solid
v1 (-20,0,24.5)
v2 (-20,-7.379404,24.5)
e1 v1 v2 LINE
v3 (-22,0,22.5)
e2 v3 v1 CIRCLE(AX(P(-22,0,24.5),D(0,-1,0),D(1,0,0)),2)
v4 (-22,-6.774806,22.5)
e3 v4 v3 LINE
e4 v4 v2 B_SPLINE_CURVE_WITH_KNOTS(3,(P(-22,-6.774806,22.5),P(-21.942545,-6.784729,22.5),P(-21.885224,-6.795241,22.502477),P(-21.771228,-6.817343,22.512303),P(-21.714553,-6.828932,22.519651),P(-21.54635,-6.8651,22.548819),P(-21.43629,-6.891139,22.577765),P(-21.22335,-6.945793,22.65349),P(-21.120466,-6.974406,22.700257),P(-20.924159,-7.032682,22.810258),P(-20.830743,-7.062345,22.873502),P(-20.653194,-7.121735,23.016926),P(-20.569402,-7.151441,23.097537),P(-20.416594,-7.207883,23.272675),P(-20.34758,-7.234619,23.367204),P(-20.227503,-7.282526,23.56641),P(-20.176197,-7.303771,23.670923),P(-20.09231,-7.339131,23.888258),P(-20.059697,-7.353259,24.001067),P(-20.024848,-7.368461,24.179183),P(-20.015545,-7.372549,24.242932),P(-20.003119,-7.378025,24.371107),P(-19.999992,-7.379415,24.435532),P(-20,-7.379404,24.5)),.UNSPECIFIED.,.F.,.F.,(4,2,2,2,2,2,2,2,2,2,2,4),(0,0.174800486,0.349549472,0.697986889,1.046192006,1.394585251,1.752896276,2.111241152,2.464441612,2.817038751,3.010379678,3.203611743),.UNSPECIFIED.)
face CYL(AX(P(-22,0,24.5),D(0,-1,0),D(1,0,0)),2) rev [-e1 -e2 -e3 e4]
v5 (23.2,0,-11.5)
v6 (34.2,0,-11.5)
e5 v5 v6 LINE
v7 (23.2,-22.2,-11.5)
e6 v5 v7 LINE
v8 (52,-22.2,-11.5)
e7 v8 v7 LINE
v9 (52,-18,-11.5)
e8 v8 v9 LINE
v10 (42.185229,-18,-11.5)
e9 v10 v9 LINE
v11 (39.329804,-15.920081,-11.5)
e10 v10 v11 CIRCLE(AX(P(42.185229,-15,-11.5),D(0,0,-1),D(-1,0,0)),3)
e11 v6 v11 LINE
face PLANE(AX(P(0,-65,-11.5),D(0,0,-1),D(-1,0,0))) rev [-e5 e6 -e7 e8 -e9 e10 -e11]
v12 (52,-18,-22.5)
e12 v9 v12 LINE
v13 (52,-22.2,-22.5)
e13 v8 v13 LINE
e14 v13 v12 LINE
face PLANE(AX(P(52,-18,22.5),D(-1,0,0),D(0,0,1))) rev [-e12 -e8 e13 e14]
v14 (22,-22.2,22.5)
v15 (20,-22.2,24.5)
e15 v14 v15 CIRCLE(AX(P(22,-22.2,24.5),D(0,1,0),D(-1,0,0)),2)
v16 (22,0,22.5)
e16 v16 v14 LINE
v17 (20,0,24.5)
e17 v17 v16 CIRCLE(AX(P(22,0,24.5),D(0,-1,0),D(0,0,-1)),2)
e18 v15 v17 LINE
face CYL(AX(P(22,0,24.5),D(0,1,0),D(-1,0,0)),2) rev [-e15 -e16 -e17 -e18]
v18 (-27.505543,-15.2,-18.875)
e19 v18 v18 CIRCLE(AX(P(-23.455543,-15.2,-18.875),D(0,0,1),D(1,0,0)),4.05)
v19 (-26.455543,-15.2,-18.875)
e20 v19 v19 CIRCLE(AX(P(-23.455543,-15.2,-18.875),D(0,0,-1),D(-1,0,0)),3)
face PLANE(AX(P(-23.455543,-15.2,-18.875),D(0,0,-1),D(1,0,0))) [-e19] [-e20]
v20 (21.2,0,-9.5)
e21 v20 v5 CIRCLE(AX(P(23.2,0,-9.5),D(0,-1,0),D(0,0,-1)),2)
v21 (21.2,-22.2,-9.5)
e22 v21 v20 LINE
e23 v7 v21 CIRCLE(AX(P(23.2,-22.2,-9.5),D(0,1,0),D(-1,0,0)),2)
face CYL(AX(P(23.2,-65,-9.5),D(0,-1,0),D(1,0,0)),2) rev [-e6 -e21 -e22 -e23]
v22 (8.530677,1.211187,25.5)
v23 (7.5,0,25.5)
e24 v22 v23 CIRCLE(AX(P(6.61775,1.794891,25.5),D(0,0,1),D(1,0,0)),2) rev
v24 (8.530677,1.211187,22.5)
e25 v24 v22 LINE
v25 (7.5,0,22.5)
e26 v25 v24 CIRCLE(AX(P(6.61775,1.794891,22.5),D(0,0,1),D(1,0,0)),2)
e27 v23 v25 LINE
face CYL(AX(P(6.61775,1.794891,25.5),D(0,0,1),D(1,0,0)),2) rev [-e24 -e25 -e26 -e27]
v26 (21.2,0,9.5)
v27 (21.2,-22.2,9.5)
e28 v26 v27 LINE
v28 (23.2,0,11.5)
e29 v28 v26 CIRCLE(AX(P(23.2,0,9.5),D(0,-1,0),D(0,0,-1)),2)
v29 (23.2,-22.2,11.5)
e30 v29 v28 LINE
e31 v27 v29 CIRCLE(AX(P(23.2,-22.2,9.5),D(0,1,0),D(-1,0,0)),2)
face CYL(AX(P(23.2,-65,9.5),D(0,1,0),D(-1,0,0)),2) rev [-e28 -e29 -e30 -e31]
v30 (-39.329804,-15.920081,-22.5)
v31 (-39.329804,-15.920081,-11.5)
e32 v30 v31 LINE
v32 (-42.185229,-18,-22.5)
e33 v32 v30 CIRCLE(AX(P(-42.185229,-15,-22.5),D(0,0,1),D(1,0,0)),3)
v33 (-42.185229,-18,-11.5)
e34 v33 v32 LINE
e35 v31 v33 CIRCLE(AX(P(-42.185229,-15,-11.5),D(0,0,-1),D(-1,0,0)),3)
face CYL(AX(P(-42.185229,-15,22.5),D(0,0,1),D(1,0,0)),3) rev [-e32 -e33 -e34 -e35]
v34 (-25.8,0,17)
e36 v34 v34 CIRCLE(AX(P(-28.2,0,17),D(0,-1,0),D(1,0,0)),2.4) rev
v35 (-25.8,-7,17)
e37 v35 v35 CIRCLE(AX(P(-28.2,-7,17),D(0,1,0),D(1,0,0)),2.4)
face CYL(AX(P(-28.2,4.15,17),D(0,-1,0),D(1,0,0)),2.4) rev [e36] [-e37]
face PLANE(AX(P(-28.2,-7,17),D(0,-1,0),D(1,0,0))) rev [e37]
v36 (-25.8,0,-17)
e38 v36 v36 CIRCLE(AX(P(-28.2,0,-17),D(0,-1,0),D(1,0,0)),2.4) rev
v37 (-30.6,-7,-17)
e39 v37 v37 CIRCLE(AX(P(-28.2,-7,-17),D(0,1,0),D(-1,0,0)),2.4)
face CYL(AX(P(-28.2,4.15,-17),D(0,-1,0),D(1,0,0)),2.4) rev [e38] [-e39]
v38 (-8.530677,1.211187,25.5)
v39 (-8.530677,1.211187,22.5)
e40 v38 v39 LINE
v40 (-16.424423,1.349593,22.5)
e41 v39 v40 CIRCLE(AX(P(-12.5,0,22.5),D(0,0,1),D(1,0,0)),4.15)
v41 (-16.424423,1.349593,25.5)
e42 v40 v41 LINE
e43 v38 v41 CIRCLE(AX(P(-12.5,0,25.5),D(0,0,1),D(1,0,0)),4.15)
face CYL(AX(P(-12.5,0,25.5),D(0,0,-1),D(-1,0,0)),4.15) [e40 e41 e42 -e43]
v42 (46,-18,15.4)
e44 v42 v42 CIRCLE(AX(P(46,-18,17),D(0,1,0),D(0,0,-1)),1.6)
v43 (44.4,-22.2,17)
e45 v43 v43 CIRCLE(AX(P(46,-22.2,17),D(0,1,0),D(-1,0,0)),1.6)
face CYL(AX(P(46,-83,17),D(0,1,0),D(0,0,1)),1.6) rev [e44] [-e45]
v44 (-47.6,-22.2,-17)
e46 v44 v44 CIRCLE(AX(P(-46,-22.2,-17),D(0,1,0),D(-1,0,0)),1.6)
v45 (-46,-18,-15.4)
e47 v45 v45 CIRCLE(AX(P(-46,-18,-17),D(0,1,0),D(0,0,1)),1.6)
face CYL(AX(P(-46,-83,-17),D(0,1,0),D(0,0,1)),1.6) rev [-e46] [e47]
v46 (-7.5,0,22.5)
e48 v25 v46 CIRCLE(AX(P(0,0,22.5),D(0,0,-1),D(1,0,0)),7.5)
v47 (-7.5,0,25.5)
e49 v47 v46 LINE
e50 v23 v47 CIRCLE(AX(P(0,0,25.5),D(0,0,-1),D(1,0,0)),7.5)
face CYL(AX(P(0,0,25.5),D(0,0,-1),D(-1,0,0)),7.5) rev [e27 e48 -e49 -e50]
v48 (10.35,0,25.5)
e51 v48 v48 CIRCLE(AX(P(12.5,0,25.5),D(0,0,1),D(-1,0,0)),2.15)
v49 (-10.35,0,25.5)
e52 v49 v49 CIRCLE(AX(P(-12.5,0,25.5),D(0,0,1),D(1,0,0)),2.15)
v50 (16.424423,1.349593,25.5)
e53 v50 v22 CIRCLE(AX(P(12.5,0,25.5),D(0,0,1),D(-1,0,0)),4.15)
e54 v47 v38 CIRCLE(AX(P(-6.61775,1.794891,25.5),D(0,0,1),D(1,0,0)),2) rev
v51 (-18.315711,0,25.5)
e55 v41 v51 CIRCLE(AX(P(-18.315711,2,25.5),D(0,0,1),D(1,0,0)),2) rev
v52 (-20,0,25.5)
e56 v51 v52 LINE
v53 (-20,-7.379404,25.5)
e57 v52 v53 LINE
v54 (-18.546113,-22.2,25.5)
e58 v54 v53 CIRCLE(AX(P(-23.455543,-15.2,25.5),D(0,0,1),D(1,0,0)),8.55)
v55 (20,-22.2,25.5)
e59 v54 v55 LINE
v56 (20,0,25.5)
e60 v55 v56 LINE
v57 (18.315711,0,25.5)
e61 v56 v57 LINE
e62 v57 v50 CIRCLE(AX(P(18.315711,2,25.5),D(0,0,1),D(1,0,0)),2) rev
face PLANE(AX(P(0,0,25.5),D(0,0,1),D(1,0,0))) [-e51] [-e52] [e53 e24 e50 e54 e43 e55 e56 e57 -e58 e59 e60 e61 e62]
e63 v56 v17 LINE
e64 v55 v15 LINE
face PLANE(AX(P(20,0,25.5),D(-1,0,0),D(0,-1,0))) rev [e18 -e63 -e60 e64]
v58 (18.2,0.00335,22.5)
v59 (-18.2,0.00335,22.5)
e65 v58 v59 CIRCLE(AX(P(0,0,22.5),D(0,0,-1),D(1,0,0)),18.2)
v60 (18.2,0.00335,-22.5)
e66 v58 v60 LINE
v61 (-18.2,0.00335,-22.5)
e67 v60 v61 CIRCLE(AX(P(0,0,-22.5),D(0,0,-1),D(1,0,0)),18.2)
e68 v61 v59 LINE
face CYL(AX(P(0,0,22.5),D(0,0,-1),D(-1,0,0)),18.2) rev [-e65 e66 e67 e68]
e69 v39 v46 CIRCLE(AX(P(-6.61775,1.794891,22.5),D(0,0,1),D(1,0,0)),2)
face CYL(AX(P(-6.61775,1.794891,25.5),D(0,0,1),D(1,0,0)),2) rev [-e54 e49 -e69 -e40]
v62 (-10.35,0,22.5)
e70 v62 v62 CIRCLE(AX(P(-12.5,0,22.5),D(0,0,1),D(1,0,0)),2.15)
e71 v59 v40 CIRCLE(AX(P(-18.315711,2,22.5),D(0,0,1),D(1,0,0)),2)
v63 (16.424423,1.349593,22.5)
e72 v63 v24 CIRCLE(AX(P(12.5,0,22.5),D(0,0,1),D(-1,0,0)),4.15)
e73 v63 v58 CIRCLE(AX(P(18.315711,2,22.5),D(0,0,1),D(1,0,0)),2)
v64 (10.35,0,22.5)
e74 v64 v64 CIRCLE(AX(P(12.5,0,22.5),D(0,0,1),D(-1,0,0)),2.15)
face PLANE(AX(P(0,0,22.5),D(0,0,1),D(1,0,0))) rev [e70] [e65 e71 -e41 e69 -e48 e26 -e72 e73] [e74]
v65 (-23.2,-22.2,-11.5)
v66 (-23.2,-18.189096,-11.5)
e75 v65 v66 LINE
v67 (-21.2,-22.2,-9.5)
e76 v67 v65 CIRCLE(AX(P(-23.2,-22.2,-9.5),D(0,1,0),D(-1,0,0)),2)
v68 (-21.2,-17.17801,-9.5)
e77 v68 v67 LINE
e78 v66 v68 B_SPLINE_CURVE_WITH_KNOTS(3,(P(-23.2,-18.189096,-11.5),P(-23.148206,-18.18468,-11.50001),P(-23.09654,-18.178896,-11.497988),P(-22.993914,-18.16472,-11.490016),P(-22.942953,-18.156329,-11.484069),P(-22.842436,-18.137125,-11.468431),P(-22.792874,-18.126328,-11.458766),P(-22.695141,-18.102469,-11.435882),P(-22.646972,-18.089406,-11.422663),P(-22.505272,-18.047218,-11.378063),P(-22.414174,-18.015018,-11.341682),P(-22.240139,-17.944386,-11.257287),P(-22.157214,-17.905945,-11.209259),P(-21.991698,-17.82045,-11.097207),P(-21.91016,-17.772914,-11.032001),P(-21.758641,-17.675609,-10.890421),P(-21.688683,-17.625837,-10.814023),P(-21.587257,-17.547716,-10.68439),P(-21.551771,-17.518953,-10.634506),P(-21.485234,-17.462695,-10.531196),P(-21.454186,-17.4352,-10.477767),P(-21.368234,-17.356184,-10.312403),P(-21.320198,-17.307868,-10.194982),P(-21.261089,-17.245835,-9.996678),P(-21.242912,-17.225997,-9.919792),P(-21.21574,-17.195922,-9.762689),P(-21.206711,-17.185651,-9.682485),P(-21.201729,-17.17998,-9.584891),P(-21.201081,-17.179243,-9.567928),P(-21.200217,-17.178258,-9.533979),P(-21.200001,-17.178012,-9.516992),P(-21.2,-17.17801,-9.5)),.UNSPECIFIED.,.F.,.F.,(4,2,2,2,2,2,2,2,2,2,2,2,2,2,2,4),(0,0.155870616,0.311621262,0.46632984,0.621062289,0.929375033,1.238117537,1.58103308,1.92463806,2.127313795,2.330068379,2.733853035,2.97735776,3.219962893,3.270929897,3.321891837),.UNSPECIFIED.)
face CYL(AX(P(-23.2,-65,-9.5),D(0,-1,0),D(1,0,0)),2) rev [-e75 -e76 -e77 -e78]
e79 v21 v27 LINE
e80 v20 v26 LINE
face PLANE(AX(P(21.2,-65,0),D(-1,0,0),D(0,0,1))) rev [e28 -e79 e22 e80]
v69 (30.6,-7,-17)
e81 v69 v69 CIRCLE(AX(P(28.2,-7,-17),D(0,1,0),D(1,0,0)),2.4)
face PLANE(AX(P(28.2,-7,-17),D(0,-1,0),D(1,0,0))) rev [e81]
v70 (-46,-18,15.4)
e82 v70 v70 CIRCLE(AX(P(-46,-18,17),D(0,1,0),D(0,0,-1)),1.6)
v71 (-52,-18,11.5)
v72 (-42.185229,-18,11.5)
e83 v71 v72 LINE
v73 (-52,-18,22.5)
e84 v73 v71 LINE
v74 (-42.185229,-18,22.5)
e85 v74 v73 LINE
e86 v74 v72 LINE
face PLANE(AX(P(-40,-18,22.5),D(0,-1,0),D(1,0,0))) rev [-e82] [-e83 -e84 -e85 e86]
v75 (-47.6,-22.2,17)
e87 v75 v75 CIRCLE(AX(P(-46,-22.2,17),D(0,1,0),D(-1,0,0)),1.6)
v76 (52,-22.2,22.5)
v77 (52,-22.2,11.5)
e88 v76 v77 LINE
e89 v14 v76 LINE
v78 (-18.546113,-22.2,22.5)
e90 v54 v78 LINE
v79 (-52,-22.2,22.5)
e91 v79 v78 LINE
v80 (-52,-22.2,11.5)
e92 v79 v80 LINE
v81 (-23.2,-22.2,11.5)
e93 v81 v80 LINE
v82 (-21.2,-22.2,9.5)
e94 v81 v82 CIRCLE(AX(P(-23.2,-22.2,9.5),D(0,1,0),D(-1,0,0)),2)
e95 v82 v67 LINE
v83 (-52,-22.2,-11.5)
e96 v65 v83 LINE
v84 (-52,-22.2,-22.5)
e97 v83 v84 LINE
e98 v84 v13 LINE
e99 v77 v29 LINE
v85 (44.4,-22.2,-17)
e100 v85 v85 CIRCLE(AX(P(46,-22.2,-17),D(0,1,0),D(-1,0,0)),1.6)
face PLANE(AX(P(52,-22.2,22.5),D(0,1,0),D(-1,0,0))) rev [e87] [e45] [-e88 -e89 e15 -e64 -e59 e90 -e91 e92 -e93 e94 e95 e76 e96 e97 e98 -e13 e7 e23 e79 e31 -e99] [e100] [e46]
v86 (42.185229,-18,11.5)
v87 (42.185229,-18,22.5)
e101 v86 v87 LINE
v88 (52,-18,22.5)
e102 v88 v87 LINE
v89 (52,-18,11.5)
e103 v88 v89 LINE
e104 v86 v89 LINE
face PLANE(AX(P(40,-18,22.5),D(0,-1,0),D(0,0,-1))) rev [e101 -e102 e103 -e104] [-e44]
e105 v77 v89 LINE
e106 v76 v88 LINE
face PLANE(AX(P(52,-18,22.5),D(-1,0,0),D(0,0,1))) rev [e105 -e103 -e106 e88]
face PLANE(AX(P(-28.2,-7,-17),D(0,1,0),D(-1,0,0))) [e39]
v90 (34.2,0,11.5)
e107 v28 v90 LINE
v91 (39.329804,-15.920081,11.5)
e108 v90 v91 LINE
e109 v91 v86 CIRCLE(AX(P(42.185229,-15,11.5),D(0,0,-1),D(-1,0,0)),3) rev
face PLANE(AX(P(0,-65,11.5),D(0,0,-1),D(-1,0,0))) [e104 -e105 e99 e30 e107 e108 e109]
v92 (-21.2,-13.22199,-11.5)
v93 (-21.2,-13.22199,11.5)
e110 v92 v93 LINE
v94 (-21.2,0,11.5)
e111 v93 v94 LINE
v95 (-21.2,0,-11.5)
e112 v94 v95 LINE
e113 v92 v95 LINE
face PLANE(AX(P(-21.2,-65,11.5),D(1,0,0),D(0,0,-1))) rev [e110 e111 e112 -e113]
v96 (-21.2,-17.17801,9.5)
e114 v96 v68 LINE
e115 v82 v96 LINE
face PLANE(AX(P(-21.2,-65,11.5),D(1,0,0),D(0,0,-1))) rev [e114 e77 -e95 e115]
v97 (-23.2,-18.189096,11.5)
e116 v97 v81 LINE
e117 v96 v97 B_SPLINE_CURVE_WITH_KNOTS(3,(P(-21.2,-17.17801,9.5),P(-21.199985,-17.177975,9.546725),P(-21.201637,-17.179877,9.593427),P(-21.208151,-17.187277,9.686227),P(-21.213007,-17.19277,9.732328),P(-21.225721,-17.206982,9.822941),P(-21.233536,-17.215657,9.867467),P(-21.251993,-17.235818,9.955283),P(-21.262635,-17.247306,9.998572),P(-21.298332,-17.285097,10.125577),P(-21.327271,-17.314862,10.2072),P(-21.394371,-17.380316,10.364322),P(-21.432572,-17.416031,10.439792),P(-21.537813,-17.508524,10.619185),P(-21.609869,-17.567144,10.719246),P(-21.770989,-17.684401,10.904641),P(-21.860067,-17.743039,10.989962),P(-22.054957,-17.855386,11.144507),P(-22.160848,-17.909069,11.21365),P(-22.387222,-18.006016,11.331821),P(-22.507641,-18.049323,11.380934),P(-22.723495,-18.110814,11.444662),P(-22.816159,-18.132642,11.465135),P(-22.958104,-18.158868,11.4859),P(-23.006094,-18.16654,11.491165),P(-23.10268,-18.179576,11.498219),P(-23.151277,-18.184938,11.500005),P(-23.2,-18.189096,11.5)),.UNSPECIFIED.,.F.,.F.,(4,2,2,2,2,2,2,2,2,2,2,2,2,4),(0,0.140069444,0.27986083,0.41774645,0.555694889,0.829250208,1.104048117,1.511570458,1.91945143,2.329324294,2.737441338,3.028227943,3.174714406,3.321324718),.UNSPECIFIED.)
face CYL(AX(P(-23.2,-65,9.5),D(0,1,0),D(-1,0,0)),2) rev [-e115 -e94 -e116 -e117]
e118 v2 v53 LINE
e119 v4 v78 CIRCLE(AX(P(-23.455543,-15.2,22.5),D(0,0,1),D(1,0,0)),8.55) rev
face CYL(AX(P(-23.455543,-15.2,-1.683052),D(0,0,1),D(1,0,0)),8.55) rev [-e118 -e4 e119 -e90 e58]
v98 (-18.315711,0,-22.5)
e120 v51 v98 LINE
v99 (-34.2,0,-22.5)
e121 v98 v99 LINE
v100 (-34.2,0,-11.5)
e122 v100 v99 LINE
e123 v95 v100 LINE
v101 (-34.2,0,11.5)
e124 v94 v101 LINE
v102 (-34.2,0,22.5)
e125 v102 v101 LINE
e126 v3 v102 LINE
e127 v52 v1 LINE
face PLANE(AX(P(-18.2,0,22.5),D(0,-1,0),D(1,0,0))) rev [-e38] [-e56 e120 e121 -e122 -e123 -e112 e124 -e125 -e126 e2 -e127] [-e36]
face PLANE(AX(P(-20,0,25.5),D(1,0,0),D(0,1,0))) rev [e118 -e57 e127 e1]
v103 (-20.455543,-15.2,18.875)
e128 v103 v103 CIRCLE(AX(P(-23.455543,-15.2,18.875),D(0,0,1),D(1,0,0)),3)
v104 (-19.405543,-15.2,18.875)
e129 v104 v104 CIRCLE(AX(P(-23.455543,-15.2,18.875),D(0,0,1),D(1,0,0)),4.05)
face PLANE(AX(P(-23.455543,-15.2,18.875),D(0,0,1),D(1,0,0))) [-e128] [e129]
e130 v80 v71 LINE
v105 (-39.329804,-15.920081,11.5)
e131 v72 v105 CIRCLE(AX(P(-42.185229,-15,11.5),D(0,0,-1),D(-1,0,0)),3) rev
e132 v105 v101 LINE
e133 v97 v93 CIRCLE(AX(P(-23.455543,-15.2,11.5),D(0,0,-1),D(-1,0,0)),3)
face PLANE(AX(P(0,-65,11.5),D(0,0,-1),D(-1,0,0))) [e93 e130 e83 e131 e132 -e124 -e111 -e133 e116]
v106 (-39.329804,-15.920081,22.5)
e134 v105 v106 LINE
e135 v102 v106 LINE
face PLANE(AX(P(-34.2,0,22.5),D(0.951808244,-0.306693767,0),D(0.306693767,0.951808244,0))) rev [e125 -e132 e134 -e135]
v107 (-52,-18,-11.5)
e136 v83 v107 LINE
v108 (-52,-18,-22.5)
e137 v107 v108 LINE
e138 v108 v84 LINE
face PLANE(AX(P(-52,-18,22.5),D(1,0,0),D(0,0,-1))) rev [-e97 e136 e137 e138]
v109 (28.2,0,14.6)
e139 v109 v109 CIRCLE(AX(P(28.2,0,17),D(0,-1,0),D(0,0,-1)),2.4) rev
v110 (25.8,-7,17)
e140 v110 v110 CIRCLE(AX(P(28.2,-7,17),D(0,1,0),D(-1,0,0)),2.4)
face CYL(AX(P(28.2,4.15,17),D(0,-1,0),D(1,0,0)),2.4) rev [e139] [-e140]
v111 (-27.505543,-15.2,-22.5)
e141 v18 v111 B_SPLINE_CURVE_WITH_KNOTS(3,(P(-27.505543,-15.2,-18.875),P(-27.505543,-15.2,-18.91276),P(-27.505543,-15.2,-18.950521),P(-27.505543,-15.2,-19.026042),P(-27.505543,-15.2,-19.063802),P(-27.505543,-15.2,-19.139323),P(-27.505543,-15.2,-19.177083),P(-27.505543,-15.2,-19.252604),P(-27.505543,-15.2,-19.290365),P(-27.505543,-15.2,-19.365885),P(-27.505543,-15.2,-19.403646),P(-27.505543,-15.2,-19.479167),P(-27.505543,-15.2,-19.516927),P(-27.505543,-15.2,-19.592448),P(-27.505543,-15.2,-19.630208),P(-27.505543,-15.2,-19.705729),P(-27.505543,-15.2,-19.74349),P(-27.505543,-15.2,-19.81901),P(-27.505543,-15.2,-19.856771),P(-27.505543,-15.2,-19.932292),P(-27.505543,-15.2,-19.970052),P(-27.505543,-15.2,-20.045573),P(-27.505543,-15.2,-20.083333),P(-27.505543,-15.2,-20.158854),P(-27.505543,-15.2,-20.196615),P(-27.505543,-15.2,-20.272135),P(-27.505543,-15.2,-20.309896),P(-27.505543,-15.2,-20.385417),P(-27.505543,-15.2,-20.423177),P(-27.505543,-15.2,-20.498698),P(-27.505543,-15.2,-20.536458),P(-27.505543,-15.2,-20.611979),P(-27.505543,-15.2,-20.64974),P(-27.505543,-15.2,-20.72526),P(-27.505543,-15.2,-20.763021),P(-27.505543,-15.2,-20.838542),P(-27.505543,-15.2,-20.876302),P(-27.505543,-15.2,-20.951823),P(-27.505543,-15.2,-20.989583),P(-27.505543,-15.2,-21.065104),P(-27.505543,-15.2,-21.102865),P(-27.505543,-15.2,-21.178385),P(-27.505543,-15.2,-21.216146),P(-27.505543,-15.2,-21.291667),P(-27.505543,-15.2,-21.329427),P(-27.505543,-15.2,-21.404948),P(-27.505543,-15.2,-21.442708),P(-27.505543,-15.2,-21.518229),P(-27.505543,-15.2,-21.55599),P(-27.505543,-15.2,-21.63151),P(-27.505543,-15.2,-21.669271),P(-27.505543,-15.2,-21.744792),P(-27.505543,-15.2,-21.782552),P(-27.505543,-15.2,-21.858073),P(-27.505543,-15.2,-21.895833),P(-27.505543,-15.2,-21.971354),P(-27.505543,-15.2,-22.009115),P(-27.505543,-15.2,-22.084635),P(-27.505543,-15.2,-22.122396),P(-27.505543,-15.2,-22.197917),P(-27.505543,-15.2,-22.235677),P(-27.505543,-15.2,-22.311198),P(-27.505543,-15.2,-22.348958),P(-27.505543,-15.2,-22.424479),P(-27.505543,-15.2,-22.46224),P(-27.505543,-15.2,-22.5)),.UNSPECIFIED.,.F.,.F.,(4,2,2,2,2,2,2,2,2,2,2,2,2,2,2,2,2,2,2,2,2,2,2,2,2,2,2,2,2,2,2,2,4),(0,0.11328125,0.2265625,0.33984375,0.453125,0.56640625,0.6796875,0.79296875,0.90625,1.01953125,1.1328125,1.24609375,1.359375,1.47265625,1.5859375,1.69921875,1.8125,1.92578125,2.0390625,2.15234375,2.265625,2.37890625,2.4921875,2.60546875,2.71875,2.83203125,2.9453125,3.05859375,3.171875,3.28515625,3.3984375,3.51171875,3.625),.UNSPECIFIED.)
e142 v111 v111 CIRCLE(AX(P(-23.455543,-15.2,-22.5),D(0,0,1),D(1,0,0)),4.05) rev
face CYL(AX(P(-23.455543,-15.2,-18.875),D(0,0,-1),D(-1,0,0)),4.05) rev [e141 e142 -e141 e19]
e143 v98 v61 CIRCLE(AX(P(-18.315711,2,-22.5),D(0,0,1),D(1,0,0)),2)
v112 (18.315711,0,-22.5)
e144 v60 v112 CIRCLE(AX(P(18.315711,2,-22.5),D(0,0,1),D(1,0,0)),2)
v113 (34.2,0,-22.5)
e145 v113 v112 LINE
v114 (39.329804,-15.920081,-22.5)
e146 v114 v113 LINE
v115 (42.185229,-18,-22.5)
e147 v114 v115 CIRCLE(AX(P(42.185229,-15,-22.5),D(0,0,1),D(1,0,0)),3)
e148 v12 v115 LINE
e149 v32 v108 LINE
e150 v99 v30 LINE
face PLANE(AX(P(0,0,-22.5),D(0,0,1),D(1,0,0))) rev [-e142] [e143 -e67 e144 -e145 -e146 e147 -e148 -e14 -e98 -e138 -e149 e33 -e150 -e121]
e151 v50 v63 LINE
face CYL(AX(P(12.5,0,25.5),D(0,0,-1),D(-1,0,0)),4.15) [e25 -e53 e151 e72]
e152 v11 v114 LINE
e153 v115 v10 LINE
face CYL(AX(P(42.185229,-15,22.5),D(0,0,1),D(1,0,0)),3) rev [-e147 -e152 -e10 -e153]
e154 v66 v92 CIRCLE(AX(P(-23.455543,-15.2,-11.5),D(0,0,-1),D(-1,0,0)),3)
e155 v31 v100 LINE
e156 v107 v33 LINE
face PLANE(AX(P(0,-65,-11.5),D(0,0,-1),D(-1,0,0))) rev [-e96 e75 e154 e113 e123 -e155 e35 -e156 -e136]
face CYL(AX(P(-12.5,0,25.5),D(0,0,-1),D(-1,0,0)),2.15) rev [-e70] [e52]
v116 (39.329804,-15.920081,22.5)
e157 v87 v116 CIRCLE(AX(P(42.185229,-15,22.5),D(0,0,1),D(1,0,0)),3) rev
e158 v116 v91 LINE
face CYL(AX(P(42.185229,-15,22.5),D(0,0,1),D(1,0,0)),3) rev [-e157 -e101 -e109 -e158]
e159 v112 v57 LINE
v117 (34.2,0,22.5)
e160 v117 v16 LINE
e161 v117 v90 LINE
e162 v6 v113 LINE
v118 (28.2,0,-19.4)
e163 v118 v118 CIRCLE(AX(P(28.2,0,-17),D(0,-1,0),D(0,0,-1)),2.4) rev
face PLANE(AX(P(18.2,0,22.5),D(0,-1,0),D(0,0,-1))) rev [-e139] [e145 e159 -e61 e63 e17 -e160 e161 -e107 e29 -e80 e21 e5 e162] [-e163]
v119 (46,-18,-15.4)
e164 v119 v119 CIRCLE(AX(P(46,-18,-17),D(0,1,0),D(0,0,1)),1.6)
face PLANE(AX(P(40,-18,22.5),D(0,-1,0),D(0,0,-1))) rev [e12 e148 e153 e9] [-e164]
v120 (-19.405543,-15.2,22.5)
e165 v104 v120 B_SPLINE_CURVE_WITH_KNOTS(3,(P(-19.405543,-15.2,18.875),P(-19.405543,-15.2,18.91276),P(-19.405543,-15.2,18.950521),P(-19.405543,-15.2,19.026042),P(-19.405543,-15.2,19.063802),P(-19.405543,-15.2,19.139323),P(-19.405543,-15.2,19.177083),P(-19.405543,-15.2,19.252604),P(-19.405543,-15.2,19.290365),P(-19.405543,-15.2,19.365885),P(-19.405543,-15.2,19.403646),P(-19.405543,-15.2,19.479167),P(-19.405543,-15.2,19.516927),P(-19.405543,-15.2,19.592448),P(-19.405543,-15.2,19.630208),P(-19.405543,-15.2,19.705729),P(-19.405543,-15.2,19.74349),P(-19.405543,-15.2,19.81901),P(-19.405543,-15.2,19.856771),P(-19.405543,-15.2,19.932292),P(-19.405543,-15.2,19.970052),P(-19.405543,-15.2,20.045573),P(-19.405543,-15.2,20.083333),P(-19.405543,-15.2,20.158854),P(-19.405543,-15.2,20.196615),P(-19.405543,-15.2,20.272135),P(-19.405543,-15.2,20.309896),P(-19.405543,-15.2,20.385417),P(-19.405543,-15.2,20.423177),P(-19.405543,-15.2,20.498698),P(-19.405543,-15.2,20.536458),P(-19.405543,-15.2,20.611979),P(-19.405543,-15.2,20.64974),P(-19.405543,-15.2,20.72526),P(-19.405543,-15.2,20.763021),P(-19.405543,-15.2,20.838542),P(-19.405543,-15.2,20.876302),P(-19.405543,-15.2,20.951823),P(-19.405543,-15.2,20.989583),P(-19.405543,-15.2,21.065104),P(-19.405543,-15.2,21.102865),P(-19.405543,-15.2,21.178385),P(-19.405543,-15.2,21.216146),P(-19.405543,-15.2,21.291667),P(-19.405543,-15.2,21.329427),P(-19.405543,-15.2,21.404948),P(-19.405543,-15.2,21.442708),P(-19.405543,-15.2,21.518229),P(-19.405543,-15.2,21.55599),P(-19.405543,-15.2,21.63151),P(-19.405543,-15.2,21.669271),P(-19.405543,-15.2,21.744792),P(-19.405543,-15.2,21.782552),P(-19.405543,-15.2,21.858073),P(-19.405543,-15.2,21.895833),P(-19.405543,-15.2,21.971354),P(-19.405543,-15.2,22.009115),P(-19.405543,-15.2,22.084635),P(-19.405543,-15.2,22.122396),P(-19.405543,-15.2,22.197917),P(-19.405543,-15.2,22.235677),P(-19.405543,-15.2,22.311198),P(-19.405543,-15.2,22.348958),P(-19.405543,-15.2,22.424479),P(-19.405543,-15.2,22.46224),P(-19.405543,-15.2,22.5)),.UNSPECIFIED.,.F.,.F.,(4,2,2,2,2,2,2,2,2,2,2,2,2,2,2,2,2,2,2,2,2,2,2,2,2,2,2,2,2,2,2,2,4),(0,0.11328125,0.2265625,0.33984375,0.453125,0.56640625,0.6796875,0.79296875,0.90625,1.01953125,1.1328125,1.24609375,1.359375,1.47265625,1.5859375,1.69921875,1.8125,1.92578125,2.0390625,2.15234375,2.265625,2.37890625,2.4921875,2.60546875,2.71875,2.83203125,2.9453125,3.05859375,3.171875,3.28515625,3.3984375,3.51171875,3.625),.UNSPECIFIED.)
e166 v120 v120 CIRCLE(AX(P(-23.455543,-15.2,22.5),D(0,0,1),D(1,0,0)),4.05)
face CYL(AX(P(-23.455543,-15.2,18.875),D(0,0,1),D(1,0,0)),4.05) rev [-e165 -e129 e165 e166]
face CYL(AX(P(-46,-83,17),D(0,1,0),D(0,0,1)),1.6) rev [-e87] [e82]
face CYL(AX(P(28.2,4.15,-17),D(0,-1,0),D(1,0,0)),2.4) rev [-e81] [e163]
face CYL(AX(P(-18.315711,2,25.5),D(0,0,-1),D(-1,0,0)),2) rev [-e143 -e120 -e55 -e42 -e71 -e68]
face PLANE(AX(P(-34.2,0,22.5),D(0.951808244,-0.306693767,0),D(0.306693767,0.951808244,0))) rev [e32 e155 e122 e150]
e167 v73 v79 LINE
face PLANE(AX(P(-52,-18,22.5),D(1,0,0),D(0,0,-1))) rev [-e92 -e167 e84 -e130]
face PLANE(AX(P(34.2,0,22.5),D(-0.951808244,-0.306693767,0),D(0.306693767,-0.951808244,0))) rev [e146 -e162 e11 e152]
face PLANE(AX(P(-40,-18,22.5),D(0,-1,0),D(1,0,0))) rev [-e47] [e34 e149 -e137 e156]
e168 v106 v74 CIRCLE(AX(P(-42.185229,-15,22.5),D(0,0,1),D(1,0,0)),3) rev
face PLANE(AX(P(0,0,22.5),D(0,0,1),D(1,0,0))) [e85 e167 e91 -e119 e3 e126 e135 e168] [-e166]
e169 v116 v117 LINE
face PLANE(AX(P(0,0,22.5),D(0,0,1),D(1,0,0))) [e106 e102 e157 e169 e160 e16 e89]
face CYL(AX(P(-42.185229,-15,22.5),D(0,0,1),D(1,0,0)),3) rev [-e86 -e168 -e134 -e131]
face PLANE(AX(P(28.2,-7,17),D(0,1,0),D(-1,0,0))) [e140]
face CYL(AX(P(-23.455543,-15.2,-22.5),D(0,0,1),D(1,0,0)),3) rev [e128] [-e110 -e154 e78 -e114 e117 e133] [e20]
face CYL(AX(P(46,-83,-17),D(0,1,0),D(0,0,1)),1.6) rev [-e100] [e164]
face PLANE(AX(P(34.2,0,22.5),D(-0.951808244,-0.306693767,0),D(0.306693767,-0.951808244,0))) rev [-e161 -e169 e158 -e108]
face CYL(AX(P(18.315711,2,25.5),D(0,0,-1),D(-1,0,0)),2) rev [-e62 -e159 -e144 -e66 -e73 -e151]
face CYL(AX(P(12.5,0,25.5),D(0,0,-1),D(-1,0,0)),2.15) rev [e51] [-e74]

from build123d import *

# Parameters (mm, degrees)
BOSS_EXTRUDE1_DEPTH        = 22.5
SKETCH2_W                  = 30.8
SKETCH2_H                  = 23
CUT_EXTRUDE1_DEPTH         = 65
SKETCH3_R                  = 1.6
CUT_EXTRUDE2_DEPTH         = 65
SKETCH7_R                  = 2.15
MOTOR_MOUNTING_DEPTH       = 3
SKETCH4_R                  = 4.05
BEARING_HOLE_DEPTH         = 3.625
AXLE_THRU_HOLES_DEPTH      = 71.062333854
AXLE_THRU_HOLES_DEPTH_BACK = 71.062333854
SKETCH5_R                  = 3
FILLET3_R                  = 2
TOP_MOUNT_HOLES_DEPTH      = 63.024914385
TOP_MOUNT_HOLES_DEPTH_BACK = 7
SKETCH6_R                  = 2.4
FILLET4_R                  = 3
FILLET5_START              = 22.5
FILLET5_DEPTH              = 3
FILLET5_START_2            = -13.087721306
FILLET5_2_DEPTH            = 13.087721306
FILLET5_START_3            = -22.2
FILLET5_3_DEPTH            = 9.436583025
FILLET5_4_OUTLINE_R        = 4.05
FILLET5_4_DEPTH            = 2.71686
FILLET5_5_DEPTH            = 3
FILLET5_START_4            = -22.5
FILLET5_6_DEPTH            = 45
CUT_EXTRUDE3_REACH         = 76.168
SKETCH8_R                  = 8.55


with BuildPart() as part:
    # Sketch1 → Boss-Extrude1 (new, symmetric)
    with BuildSketch(Plane.XY):
        with BuildLine():
            Line((-18.2, 0), (-34.2, 0))
            Line((-34.2, 0), (-40, -18))
            Line((-40, -18), (-52, -18))
            Line((-52, -18), (-52, -22.2))
            Line((-52, -22.2), (0, -22.2))
            Line((0, -22.2), (52, -22.2))
            Line((52, -22.2), (52, -18))
            Line((52, -18), (40, -18))
            Line((40, -18), (34.2, 0))
            Line((34.2, 0), (18.2, 0))
            ThreePointArc((18.2, 0), (0, -18.2), (-18.2, 0))
        make_face()
    extrude(amount=BOSS_EXTRUDE1_DEPTH, both=True)

    # Sketch2 → Cut-Extrude1 (cut)
    with BuildSketch(Plane(origin=(0, 0, 0), x_dir=(1, 0, 0), z_dir=(0, 1, 0))):
        with Locations((-36.6, 0)):
            Rectangle(SKETCH2_W, SKETCH2_H)
        with Locations((36.6, 0)):
            Rectangle(SKETCH2_W, SKETCH2_H)
    extrude(amount=-CUT_EXTRUDE1_DEPTH, mode=Mode.SUBTRACT)

    # Sketch3 → Cut-Extrude2 (cut)
    with BuildSketch(Plane(origin=(0, -18, 0), x_dir=(1, 0, 0), z_dir=(0, 1, 0))):
        with Locations(Location((-46, 17, 0), (0, 0, 270))):
            Circle(SKETCH3_R)
        with Locations(Location((46, 17, 0), (0, 0, 270))):
            Circle(SKETCH3_R)
        with Locations(Location((46, -17, 0), (0, 0, 180))):
            Circle(SKETCH3_R)
        with Locations(Location((-46, -17, 0), (0, 0, 180))):
            Circle(SKETCH3_R)
    extrude(amount=-CUT_EXTRUDE2_DEPTH, mode=Mode.SUBTRACT)

    # Sketch7 → Motor-Mounting (add)
    with BuildSketch(Plane.XY.offset(22.5)):
        with BuildLine():
            Line((-7.5, 0), (-8.35, 0))
            ThreePointArc((-8.35, 0), (-12.5, 4.15), (-16.65, 0))
            Line((-16.65, 0), (-18.2, 0))
            Line((-18.2, 0), (-20, 0))
            Line((-20, 0), (-20, -22.2))
            Line((-20, -22.2), (0, -22.2))
            Line((0, -22.2), (20, -22.2))
            Line((20, -22.2), (20, 0))
            Line((20, 0), (18.2, 0))
            Line((18.2, 0), (16.65, 0))
            ThreePointArc((16.65, 0), (12.5, 4.15), (8.35, 0))
            Line((8.35, 0), (7.5, 0))
            ThreePointArc((7.5, 0), (0, -7.5), (-7.5, 0))
        make_face()
        with Locations((-12.5, 0)):
            Circle(SKETCH7_R, mode=Mode.SUBTRACT)
        with Locations(Location((12.5, 0, 0), (0, 0, 180))):
            Circle(SKETCH7_R, mode=Mode.SUBTRACT)
    extrude(amount=MOTOR_MOUNTING_DEPTH)

    # Sketch4 → Bearing-Hole (cut, symmetric)
    with BuildSketch(Plane.XY.offset(22.5)):
        with Locations((-23.455543055, -15.2)):
            Circle(SKETCH4_R)
    bearing_hole = extrude(amount=BEARING_HOLE_DEPTH, both=True, mode=Mode.SUBTRACT)

    # Mirror1: Bearing-Hole across plane
    add(bearing_hole.mirror(Plane.XY), mode=Mode.SUBTRACT)

    # Sketch5 → Axle-Thru-Holes (cut, two sides: drawn at the far end of the back side and taken through both)
    with BuildSketch(Plane.XY.offset(18.875).offset(-AXLE_THRU_HOLES_DEPTH_BACK)):
        with Locations((-23.455543055, -15.2)):
            Circle(SKETCH5_R)
    extrude(amount=AXLE_THRU_HOLES_DEPTH + AXLE_THRU_HOLES_DEPTH_BACK, mode=Mode.SUBTRACT)

    # Fillet3
    fillet3_edges = [part.edges().sort_by_distance(p)[0] for p in [
        (21.2, -11.1, -11.5),
        (21.2, -11.1, 11.5),
        (-21.2, -19.689005249, 11.5),
        (-21.2, -19.689005249, -11.5),
    ]]
    fillet(fillet3_edges, radius=FILLET3_R)

    # Sketch6 → Top-Mount-Holes (cut, two sides: drawn at the far end of the back side and taken through both)
    with BuildSketch(Plane(origin=(0, 0, 0), x_dir=(1, 0, 0), z_dir=(0, 1, 0)).offset(-TOP_MOUNT_HOLES_DEPTH_BACK)):
        with Locations((-28.2, 17)):
            Circle(SKETCH6_R)
        with Locations((28.2, 17)):
            Circle(SKETCH6_R)
        with Locations(Location((28.2, -17, 0), (0, 0, 90))):
            Circle(SKETCH6_R)
        with Locations((-28.2, -17)):
            Circle(SKETCH6_R)
    extrude(amount=TOP_MOUNT_HOLES_DEPTH + TOP_MOUNT_HOLES_DEPTH_BACK, mode=Mode.SUBTRACT)

    # Fillet4
    fillet4_edges = [part.edges().sort_by_distance(p)[0] for p in [
        (40, -18, 17),
        (-40, -18, 17),
        (40, -18, -17),
        (-40, -18, -17),
    ]]
    fillet(fillet4_edges, radius=FILLET4_R)

    # Fillet5: read off the stored shape, not the designer's step
    # Fillet5 outline → Fillet5 (add)
    with BuildSketch(Plane.XY.offset(FILLET5_START)):
        with BuildLine():
            ThreePointArc((-7.5, 0), (-8.14090356, 0.498741958), (-8.530676829, 1.211186842))
            ThreePointArc((-8.530676829, 1.211186842), (-8.395417734, 0.612294391), (-8.35, 0))
            Line((-8.35, 0), (-7.5, 0))
        make_face()
        with BuildLine():
            ThreePointArc((8.530676829, 1.211186842), (8.14090356, 0.498741958), (7.5, 0))
            Line((7.5, 0), (8.35, 0))
            ThreePointArc((8.35, 0), (8.395417734, 0.612294391), (8.530676829, 1.211186842))
        make_face()
    extrude(amount=FILLET5_DEPTH)

    # Fillet5 2 outline → Fillet5 2 (add)
    with BuildSketch(Plane(origin=(0, 0, 0), x_dir=(1, 0, 0), z_dir=(0, 1, 0)).offset(FILLET5_START_2)):
        with BuildLine():
            ThreePointArc((-22, -22.5), (-20.585786438, -23.085786438), (-20, -24.5))
            Line((-20, -24.5), (-20, -22.5))
            Line((-20, -22.5), (-22, -22.5))
        make_face()
        with BuildLine():
            ThreePointArc((20, -24.5), (20.585786438, -23.085786438), (22, -22.5))
            Line((22, -22.5), (20, -22.5))
            Line((20, -22.5), (20, -24.5))
        make_face()
    extrude(amount=FILLET5_2_DEPTH)

    # Fillet5 3 outline → Fillet5 3 (add)
    with BuildSketch(Plane(origin=(0, 0, 0), x_dir=(1, 0, 0), z_dir=(0, 1, 0)).offset(FILLET5_START_3)):
        with BuildLine():
            ThreePointArc((20, -24.5), (20.585786438, -23.085786438), (22, -22.5))
            Line((22, -22.5), (20, -22.5))
            Line((20, -22.5), (20, -24.5))
        make_face()
    extrude(amount=FILLET5_3_DEPTH)

    # Fillet5 4 outline → Fillet5 4 (cut)
    with BuildSketch(Plane.XY.offset(FILLET5_START)):
        with Locations((-23.455543055, -15.2)):
            Circle(FILLET5_4_OUTLINE_R)
    extrude(amount=FILLET5_4_DEPTH, mode=Mode.SUBTRACT)

    # Fillet5 5 outline → Fillet5 5 (add)
    with BuildSketch(Plane.XY.offset(FILLET5_START)):
        with BuildLine():
            ThreePointArc((18.315711478, 0), (17.153991419, 0.371993088), (16.424423193, 1.349593496))
            ThreePointArc((16.424423193, 1.349593496), (16.593217332, 0.684157785), (16.65, 0))
            Line((16.65, 0), (18.315711478, 0))
        make_face()
        with BuildLine():
            Line((-18.315711478, 0), (-16.65, 0))
            ThreePointArc((-16.65, 0), (-16.593217332, 0.684157785), (-16.424423193, 1.349593496))
            ThreePointArc((-16.424423193, 1.349593496), (-17.153991419, 0.371993088), (-18.315711478, 0))
        make_face()
    extrude(amount=FILLET5_5_DEPTH)

    # Fillet5 6 outline → Fillet5 6 (add)
    with BuildSketch(Plane.XY.offset(FILLET5_START_4)):
        with BuildLine():
            Line((18.2, 0), (18.315711478, 0))
            ThreePointArc((18.315711478, 0), (18.257831342, 0.000837703), (18.199999692, 0.00335011))
            ThreePointArc((18.199999692, 0.00335011), (18.199999923, 0.001675055), (18.2, 0))
        make_face()
        with BuildLine():
            Line((-18.315711478, 0), (-18.2, 0))
            ThreePointArc((-18.2, 0), (-18.199999923, 0.001675055), (-18.199999692, 0.00335011))
            ThreePointArc((-18.199999692, 0.00335011), (-18.257831342, 0.000837703), (-18.315711478, 0))
        make_face()
    extrude(amount=FILLET5_6_DEPTH)

    # Cut-Extrude3: up to this face of the body (flat: up to its plane)
    cut_extrude3_end = Plane(part.part.faces().sort_by_distance((-32.525053026, -12.842804107, 22.5))[0])
    # Sketch8 → Cut-Extrude3 (cut, up to the picked face)
    with BuildSketch(Plane.XY.offset(25.5), mode=Mode.PRIVATE) as cut_extrude3_sk1:
        with Locations((-23.455543055, -15.2)):
            Circle(SKETCH8_R)
    cut_extrude3_tool1 = split(extrude(cut_extrude3_sk1.sketch, amount=-CUT_EXTRUDE3_REACH, mode=Mode.PRIVATE), bisect_by=cut_extrude3_end, keep=Keep.BOTH, mode=Mode.PRIVATE)
    add(cut_extrude3_tool1.solids().sort_by(Axis((-23.455543, -15.2, 25.5), (0, 0, -1)))[0], mode=Mode.SUBTRACT)


solid = part.part
